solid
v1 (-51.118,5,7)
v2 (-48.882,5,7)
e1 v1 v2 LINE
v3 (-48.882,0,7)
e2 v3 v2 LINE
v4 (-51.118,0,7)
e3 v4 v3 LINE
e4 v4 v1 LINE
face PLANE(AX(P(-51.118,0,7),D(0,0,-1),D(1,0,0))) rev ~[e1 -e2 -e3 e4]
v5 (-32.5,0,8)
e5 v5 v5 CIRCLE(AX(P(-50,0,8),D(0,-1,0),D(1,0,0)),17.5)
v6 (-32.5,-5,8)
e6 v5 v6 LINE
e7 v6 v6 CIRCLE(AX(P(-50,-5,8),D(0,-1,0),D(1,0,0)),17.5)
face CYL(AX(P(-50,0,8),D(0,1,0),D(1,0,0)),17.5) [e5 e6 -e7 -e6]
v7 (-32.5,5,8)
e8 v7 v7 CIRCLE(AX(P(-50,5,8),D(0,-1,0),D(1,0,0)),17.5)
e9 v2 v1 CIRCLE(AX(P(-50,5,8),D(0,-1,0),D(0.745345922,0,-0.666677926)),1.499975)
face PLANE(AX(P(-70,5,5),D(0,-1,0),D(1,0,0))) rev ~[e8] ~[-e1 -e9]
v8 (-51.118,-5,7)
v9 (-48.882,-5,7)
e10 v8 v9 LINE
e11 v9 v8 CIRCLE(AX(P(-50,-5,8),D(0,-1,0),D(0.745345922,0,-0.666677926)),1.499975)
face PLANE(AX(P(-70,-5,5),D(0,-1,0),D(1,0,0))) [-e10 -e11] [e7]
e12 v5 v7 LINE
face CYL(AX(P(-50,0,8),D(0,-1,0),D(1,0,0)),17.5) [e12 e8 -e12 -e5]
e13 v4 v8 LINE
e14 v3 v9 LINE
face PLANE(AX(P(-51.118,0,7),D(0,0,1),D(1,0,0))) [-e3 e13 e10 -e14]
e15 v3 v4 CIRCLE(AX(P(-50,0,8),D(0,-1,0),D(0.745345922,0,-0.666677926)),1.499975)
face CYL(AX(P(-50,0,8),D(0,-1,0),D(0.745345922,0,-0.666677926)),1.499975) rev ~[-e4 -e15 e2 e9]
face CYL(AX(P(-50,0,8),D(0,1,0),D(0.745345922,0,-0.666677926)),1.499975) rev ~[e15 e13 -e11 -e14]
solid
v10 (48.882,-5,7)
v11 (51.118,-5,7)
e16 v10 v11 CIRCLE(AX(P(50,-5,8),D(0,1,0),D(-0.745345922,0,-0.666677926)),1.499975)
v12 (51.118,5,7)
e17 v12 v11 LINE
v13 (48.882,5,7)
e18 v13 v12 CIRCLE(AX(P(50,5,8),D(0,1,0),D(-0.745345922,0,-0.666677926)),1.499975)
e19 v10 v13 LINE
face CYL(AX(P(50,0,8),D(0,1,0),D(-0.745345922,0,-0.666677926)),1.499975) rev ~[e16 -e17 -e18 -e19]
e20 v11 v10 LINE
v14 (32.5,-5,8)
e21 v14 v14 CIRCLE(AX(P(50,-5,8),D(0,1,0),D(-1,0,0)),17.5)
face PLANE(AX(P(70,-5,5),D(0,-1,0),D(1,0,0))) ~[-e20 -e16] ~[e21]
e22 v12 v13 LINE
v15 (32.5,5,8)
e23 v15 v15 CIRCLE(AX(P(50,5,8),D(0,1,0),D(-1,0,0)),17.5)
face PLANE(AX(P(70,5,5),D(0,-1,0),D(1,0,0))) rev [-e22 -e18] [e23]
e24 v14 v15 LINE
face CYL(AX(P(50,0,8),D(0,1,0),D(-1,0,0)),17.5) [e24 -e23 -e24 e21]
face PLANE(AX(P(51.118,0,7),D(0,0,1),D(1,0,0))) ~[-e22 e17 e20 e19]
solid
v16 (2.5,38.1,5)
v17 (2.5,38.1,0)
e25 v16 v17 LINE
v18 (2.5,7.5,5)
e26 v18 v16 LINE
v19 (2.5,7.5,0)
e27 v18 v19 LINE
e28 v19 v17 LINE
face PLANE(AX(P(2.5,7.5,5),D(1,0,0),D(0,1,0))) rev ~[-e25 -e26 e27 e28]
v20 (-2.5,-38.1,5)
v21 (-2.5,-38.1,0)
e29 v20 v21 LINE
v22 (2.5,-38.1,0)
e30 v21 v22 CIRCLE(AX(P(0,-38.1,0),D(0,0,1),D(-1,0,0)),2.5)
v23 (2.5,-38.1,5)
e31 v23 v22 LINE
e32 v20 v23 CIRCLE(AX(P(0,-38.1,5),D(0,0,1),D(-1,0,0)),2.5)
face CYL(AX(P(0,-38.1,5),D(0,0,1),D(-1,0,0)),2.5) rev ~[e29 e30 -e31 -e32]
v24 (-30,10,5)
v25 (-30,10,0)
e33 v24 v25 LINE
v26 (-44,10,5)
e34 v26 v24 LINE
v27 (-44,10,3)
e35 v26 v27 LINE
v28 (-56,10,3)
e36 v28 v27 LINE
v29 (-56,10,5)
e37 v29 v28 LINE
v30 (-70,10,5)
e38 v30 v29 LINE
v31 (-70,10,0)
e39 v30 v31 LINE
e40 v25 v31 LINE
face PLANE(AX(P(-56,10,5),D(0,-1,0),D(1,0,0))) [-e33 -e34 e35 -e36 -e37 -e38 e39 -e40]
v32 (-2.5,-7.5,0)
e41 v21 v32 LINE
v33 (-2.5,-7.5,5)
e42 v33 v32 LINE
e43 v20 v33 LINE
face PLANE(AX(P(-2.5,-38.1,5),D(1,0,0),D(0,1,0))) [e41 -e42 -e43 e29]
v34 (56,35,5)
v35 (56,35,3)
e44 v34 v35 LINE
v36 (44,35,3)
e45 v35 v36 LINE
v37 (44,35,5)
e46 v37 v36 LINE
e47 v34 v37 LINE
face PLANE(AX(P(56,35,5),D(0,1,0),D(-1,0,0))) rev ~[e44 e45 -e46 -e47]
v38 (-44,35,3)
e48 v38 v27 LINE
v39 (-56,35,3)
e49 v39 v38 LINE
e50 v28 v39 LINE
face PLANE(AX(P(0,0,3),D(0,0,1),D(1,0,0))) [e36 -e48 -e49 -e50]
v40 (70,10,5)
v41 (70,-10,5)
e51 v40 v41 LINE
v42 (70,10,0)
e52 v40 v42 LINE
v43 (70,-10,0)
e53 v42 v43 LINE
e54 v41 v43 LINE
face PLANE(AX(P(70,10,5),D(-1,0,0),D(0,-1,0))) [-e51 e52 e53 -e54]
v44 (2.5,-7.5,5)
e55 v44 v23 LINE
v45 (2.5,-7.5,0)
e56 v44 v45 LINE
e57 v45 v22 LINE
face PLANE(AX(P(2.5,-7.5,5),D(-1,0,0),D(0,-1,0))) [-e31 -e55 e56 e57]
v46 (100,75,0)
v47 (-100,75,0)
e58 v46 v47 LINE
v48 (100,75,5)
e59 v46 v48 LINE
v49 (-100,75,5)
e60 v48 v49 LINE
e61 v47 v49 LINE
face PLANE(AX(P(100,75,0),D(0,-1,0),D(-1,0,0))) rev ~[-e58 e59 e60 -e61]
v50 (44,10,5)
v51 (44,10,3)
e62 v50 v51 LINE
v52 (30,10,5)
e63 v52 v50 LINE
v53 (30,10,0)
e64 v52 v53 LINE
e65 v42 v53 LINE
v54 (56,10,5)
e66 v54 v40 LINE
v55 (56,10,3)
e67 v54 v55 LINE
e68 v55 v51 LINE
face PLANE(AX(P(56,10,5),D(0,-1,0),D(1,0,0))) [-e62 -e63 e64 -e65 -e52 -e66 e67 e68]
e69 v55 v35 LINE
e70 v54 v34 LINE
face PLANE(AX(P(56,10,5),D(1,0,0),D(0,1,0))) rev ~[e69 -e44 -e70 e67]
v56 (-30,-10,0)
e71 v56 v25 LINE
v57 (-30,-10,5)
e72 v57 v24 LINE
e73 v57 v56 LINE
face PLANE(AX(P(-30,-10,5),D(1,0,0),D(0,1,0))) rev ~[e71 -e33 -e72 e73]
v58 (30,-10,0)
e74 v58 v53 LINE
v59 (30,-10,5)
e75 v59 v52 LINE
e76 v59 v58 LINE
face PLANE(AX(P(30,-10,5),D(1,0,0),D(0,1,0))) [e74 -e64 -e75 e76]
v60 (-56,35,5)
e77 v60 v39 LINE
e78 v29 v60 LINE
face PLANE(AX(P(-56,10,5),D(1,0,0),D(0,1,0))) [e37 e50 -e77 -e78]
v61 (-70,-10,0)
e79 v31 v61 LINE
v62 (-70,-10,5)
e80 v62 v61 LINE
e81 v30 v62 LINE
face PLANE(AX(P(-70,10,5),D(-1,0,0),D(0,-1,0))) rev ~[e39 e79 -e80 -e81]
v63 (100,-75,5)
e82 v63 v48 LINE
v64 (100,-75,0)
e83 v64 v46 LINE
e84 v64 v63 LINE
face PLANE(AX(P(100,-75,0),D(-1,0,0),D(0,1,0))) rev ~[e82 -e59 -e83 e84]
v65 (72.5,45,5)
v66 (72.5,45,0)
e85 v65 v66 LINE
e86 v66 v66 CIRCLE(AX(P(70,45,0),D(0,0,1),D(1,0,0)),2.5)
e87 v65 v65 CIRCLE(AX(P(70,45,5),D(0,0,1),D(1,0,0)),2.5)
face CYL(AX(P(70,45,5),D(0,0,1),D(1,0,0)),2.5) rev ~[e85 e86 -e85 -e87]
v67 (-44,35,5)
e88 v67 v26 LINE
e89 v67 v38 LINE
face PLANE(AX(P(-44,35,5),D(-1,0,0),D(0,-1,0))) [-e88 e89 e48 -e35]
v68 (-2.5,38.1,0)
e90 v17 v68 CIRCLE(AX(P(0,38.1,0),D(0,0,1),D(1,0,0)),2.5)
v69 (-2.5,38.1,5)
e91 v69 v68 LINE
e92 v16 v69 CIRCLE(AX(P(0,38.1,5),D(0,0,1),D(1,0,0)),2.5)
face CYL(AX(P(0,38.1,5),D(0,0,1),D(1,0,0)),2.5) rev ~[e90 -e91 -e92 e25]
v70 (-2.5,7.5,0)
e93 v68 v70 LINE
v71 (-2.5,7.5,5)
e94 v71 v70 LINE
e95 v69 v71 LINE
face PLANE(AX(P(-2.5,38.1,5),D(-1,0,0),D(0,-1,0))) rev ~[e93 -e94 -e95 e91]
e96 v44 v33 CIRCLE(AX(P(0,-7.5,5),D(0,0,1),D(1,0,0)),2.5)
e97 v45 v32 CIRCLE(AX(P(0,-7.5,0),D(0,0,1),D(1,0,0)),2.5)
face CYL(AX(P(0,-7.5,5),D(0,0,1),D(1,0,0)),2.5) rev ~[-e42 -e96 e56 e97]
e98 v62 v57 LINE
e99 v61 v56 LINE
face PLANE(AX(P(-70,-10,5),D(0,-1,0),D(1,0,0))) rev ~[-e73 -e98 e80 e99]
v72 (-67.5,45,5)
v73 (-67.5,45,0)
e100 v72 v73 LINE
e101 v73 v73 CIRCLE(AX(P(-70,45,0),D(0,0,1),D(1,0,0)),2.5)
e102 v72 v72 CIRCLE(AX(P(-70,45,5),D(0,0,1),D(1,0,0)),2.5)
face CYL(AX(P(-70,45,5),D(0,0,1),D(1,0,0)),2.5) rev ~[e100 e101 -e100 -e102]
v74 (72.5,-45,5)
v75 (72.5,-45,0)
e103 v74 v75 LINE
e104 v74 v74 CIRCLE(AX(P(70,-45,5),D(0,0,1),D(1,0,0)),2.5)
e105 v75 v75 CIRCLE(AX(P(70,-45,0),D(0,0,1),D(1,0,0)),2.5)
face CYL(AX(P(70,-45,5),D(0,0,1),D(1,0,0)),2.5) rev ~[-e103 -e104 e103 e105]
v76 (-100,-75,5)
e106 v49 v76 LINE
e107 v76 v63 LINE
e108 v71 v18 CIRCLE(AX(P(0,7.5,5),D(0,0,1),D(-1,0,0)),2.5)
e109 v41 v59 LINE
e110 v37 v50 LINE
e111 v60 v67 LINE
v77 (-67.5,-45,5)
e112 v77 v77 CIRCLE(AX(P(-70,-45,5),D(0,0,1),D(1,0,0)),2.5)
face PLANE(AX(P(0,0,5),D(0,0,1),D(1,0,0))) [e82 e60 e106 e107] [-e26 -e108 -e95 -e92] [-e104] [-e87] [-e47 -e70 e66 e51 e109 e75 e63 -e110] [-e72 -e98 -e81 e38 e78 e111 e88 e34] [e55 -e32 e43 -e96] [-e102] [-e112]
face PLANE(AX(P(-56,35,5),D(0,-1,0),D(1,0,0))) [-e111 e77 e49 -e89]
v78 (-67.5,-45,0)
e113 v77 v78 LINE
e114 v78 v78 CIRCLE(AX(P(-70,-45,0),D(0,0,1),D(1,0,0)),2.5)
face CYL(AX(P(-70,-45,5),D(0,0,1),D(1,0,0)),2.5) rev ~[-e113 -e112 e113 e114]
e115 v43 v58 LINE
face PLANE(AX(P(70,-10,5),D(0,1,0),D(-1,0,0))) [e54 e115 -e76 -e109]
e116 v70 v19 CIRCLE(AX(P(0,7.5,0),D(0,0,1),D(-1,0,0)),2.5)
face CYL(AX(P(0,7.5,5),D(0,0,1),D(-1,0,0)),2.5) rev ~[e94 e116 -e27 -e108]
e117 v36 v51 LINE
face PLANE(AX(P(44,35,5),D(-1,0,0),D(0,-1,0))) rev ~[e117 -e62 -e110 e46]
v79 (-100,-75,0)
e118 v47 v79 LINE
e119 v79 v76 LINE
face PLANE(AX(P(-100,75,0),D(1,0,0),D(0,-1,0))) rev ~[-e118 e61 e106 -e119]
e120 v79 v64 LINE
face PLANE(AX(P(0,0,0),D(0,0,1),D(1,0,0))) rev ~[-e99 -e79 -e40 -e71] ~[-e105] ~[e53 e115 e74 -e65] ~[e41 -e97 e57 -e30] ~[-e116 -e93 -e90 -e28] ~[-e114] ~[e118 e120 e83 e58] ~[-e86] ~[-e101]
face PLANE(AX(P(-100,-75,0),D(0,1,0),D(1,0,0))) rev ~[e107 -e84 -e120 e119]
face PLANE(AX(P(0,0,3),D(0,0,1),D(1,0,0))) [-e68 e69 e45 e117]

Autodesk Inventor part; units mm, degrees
ref_plane "YZ Plane" through (0, 0, 0) normal (1, 0, 0) x (0, 1, 0)
ref_plane "XZ Plane" through (0, 0, 0) normal (0, 1, 0) x (-1, 0, 0)
ref_plane "XY Plane" through (0, 0, 0) normal (0, 0, 1) x (1, 0, 0)
sketch "Эскиз1" plane through (0, 0, 0) normal (0, 0, 1) x (1, 0, 0)
  line L0 (-100, -75) -> (100, -75)
  line L1 (100, -75) -> (100, 75)
  line L2 (100, 75) -> (-100, 75)
  line L3 (-100, 75) -> (-100, -75)
  line L4 (-100, -75) -> (100, 75) construction
  line L5 (100, -75) -> (-100, 75) construction
  point P0 (0, 0)
  dimension "d0" = 200
  dimension "d1" = 150
extrude "Выдавливание1" add sketch "Эскиз1" along normal blind 5
sketch "Эскиз2" plane through (0, 0, 5) normal (0, 0, 1) x (1, 0, 0)
  line L0 (100, -75) -> (100, 75) construction
  line L1 (100, 0) -> (-100, 0) construction
  line L2 (-100, 75) -> (-100, -75) construction
  line L3 (100, 75) -> (-100, 75) construction
  line L4 (0, 75) -> (0, -75) construction
  line L5 (-100, -75) -> (100, -75) construction
  line L6 (-100, -10) -> (100, -10) construction
  line L7 (100, -10) -> (100, 10) construction
  line L8 (100, 10) -> (-100, 10) construction
  line L9 (-100, 10) -> (-100, -10) construction
  line L10 (-100, -10) -> (100, 10) construction
  line L11 (100, -10) -> (-100, 10) construction
  line L12 (0, 0) -> (-100, 0) construction
  line L13 (-50, 0) -> (-50, 75) construction
  line L14 (0, 0) -> (100, 0) construction
  line L15 (50, 0) -> (50, 75) construction
  line L16 (-56, 10) -> (-56, 35)
  line L17 (-56, 35) -> (-44, 35)
  line L18 (-44, 35) -> (-44, 10)
  line L19 (-56, 10) -> (-44, 10)
  line L20 (56, 10) -> (56, 35)
  line L21 (56, 35) -> (44, 35)
  line L22 (44, 35) -> (44, 10)
  line L23 (56, 10) -> (44, 10)
  line L24 (-70, -10) -> (-30, -10)
  line L25 (-30, -10) -> (-30, 10)
  line L26 (-30, 10) -> (-70, 10)
  line L27 (-70, 10) -> (-70, -10)
  line L28 (-70, -10) -> (-30, 10) construction
  line L29 (-30, -10) -> (-70, 10) construction
  line L30 (70, -10) -> (30, -10)
  line L31 (30, -10) -> (30, 10)
  line L32 (30, 10) -> (70, 10)
  line L33 (70, 10) -> (70, -10)
  dimension "d4" = 20
  dimension "d7" = 25
  dimension "d8" = 40
extrude "Выдавливание2" cut sketch "Эскиз2" against normal blind 2 contours L16 L17 L18 L19 | L23 L22 L21 L20
extrude "Выдавливание3" cut sketch "Эскиз2" against normal blind 5 contours L19 L26 L25 L24 L27 | L32 L33 L30 L31 L23
sketch "Эскиз3" plane through (0, 0, 3) normal (0, 0, 1) x (1, 0, 0)
  line L0 (-56, 10) -> (-56, 35) projected
  line L1 (-44, 10) -> (-56, 10) projected
  line L2 (-44, 35) -> (-44, 10) projected
  line L3 (-56, 35) -> (-44, 35) projected
  line L4 (-44, 35) -> (-44, 10) projected
  point P0 (0, 0)
surface extrude "ВыдавПврх1" sketch "Эскиз3" along normal blind 10 shown yes curves L4 L1 L0 L3
boundary_patch "Участок поверхности1"
sketch "Эскиз4" plane through (-56, 10, 3) normal (0, -1, 0) x (1, 0, 0)
  line L0 (0, 10) -> (12, 10) construction
  line L1 (6, 10) -> (6, 0) construction
  line L2 (12, 0) -> (0, 0) construction
  line L3 (0, 0) -> (0, 10) construction
  line L4 (0, 5) -> (12, 5) construction
  line L5 (12, 0) -> (12, 10) construction
  arc A0 (7.118, 4) -> (4.882, 4) centre (6, 5) ccw
  line L6 (6, 3.5) -> (6, 4) construction
  line L7 (6, 4) -> (7.118, 4)
  line L8 (6, 4) -> (4.882, 4)
  point P0 (56, -3)
  dimension "d17" = 3
  dimension "d18" = 0.5
surface extrude "ВыдавПврх2" sketch "Эскиз4" along normal blind 10 shown yes curves L7 A0 L8
boundary_patch "Участок поверхности2"
mirror "Зеркальное отражение1" about plane through (0, 0, 0) normal (1, 0, 0) of "Участок поверхности1", "ВыдавПврх1", "ВыдавПврх2"
ref_plane "РабПлоскость1" through (-70, 0, 5) normal (0, -1, 0) x (1, 0, 0)
sketch "Эскиз5" plane through (-70, 0, 5) normal (0, -1, 0) x (1, 0, 0)
  arc A0 (21.118, 2) -> (18.882, 2) centre (20, 3) ccw projected
  line L0 (18.882, 2) -> (21.118, 2) projected
  circle A1 centre (20, 3) radius 17.5
  point P0 (70, -5)
  dimension "d23" = 35
extrude "Выдавливание4" add sketch "Эскиз5" along normal mid plane 10
mirror "Зеркальное отражение2" about plane through (0, 0, 0) normal (1, 0, 0) of "Выдавливание4"
sketch "Эскиз6" plane through (0, 0, 5) normal (0, 0, 1) x (1, 0, 0)
  line L0 (-100, -75) -> (100, -75) projected
  line L1 (100, -75) -> (100, 75) projected
  line L2 (100, 75) -> (-100, 75) projected
  line L3 (-100, 75) -> (-100, -75) projected
  line L4 (-44, 10) -> (-30, 10) projected
  line L5 (-30, 10) -> (-30, -10) projected
  line L6 (-30, -10) -> (-70, -10) projected
  line L7 (-70, -10) -> (-70, 10) projected
  line L8 (-70, 10) -> (-56, 10) projected
  line L9 (-56, 10) -> (-56, 35) projected
  line L10 (-56, 35) -> (-44, 35) projected
  line L11 (-44, 35) -> (-44, 10) projected
  line L12 (30, 10) -> (44, 10) projected
  line L13 (44, 10) -> (44, 35) projected
  line L14 (44, 35) -> (56, 35) projected
  line L15 (56, 35) -> (56, 10) projected
  line L16 (56, 10) -> (70, 10) projected
  line L17 (70, 10) -> (70, -10) projected
  line L18 (70, -10) -> (30, -10) projected
  line L19 (30, -10) -> (30, 10) projected
  line L20 (100, -75) -> (70, -75)
  line L21 (70, -75) -> (70, -45) construction
  line L22 (70, -45) -> (100, -45) construction
  line L23 (100, -45) -> (100, -75)
  circle A0 centre (70, -45) radius 2.5
  line L24 (-100, 0) -> (100, 0) construction
  line L25 (100, 75) -> (-100, 75) construction
  line L26 (0, 75) -> (0, -75) construction
  circle A1 centre (-70, -45) radius 2.5
  circle A2 centre (70, 45) radius 2.5
  circle A3 centre (-70, 45) radius 2.5
  point P0 (0, 0)
  dimension "d26" = 30
  dimension "d27" = 30
  dimension "d28" = 5
extrude "Выдавливание5" cut sketch "Эскиз6" against normal blind 10 contours A0 | A1 | A2 | A3
sketch "Эскиз7" plane through (0, 0, 5) normal (0, 0, 1) x (1, 0, 0)
  circle A0 centre (-70, 45) radius 2.5 projected
  circle A1 centre (70, -45) radius 2.5 projected
  circle A2 centre (-70, -45) radius 2.5 projected
  circle A3 centre (70, 45) radius 2.5 projected
  line L0 (-100, -75) -> (100, -75) projected
  line L1 (100, -75) -> (100, 75) projected
  line L2 (100, 75) -> (-100, 75) projected
  line L3 (-100, 75) -> (-100, -75) projected
  line L4 (-44, 10) -> (-30, 10) projected
  line L5 (-30, 10) -> (-30, -10) projected
  line L6 (-30, -10) -> (-70, -10) projected
  line L7 (-70, -10) -> (-70, 10) projected
  line L8 (-70, 10) -> (-56, 10) projected
  line L9 (-56, 10) -> (-56, 35) projected
  line L10 (-56, 35) -> (-44, 35) projected
  line L11 (-44, 35) -> (-44, 10) projected
  line L12 (30, 10) -> (44, 10) projected
  line L13 (44, 10) -> (44, 35) projected
  line L14 (44, 35) -> (56, 35) projected
  line L15 (56, 35) -> (56, 10) projected
  line L16 (56, 10) -> (70, 10) projected
  line L17 (70, 10) -> (70, -10) projected
  line L18 (70, -10) -> (30, -10) projected
  line L19 (30, -10) -> (30, 10) projected
  line L20 (100, 75) -> (-100, 75) construction
  line L21 (-30, 10) -> (30, 10) construction
  line L22 (30, 10) -> (30, 75) construction
  line L23 (30, 75) -> (-30, 75) construction
  line L24 (-30, 75) -> (-30, 10) construction
  line L25 (-100, -75) -> (100, -75) construction
  line L26 (-30, -10) -> (30, -10) construction
  line L27 (30, -10) -> (30, -75) construction
  line L28 (30, -75) -> (-30, -75) construction
  line L29 (-30, -75) -> (-30, -10) construction
  line L30 (100, -75) -> (100, 75) construction
  line L31 (100, -7.5) -> (100, 7.5) construction
  line L32 (100, 7.5) -> (-100, 7.5) construction
  line L33 (-100, 7.5) -> (-100, -7.5) construction
  line L34 (-100, -7.5) -> (100, 7.5) construction
  line L35 (100, -7.5) -> (-100, 7.5) construction
  line L36 (-100, -7.5) -> (-2.5, -7.5) construction
  line L37 (2.5, -7.5) -> (100, -7.5) construction
  line L38 (-100, 75) -> (-100, -75) construction
  line L39 (-100, 0) -> (100, 0) construction
  arc A4 (-2.5, 7.5) -> (2.5, 7.5) centre (0, 7.5) ccw
  line L40 (2.5, 7.5) -> (2.5, 38.1)
  line L41 (-2.5, 38.1) -> (-2.5, 7.5)
  arc A5 (2.5, 38.1) -> (-2.5, 38.1) centre (0, 38.1) ccw
  line L42 (-2.5, 38.1) -> (-2.5, 7.5)
  line L43 (2.5, 7.5) -> (2.5, 38.1)
  line L44 (-2.5, -38.1) -> (-2.5, -7.5)
  line L45 (2.5, -7.5) -> (2.5, -38.1)
  arc A6 (-2.5, -38.1) -> (2.5, -38.1) centre (0, -38.1) ccw
  arc A7 (2.5, -7.5) -> (-2.5, -7.5) centre (0, -7.5) ccw
  point P0 (0, 0)
  dimension "d31" = 15
extrude "Выдавливание7" cut sketch "Эскиз7" against normal blind 10 contours L41 A5 L40 A4 | L44 A7 L45 A6
properties part number "Top"
